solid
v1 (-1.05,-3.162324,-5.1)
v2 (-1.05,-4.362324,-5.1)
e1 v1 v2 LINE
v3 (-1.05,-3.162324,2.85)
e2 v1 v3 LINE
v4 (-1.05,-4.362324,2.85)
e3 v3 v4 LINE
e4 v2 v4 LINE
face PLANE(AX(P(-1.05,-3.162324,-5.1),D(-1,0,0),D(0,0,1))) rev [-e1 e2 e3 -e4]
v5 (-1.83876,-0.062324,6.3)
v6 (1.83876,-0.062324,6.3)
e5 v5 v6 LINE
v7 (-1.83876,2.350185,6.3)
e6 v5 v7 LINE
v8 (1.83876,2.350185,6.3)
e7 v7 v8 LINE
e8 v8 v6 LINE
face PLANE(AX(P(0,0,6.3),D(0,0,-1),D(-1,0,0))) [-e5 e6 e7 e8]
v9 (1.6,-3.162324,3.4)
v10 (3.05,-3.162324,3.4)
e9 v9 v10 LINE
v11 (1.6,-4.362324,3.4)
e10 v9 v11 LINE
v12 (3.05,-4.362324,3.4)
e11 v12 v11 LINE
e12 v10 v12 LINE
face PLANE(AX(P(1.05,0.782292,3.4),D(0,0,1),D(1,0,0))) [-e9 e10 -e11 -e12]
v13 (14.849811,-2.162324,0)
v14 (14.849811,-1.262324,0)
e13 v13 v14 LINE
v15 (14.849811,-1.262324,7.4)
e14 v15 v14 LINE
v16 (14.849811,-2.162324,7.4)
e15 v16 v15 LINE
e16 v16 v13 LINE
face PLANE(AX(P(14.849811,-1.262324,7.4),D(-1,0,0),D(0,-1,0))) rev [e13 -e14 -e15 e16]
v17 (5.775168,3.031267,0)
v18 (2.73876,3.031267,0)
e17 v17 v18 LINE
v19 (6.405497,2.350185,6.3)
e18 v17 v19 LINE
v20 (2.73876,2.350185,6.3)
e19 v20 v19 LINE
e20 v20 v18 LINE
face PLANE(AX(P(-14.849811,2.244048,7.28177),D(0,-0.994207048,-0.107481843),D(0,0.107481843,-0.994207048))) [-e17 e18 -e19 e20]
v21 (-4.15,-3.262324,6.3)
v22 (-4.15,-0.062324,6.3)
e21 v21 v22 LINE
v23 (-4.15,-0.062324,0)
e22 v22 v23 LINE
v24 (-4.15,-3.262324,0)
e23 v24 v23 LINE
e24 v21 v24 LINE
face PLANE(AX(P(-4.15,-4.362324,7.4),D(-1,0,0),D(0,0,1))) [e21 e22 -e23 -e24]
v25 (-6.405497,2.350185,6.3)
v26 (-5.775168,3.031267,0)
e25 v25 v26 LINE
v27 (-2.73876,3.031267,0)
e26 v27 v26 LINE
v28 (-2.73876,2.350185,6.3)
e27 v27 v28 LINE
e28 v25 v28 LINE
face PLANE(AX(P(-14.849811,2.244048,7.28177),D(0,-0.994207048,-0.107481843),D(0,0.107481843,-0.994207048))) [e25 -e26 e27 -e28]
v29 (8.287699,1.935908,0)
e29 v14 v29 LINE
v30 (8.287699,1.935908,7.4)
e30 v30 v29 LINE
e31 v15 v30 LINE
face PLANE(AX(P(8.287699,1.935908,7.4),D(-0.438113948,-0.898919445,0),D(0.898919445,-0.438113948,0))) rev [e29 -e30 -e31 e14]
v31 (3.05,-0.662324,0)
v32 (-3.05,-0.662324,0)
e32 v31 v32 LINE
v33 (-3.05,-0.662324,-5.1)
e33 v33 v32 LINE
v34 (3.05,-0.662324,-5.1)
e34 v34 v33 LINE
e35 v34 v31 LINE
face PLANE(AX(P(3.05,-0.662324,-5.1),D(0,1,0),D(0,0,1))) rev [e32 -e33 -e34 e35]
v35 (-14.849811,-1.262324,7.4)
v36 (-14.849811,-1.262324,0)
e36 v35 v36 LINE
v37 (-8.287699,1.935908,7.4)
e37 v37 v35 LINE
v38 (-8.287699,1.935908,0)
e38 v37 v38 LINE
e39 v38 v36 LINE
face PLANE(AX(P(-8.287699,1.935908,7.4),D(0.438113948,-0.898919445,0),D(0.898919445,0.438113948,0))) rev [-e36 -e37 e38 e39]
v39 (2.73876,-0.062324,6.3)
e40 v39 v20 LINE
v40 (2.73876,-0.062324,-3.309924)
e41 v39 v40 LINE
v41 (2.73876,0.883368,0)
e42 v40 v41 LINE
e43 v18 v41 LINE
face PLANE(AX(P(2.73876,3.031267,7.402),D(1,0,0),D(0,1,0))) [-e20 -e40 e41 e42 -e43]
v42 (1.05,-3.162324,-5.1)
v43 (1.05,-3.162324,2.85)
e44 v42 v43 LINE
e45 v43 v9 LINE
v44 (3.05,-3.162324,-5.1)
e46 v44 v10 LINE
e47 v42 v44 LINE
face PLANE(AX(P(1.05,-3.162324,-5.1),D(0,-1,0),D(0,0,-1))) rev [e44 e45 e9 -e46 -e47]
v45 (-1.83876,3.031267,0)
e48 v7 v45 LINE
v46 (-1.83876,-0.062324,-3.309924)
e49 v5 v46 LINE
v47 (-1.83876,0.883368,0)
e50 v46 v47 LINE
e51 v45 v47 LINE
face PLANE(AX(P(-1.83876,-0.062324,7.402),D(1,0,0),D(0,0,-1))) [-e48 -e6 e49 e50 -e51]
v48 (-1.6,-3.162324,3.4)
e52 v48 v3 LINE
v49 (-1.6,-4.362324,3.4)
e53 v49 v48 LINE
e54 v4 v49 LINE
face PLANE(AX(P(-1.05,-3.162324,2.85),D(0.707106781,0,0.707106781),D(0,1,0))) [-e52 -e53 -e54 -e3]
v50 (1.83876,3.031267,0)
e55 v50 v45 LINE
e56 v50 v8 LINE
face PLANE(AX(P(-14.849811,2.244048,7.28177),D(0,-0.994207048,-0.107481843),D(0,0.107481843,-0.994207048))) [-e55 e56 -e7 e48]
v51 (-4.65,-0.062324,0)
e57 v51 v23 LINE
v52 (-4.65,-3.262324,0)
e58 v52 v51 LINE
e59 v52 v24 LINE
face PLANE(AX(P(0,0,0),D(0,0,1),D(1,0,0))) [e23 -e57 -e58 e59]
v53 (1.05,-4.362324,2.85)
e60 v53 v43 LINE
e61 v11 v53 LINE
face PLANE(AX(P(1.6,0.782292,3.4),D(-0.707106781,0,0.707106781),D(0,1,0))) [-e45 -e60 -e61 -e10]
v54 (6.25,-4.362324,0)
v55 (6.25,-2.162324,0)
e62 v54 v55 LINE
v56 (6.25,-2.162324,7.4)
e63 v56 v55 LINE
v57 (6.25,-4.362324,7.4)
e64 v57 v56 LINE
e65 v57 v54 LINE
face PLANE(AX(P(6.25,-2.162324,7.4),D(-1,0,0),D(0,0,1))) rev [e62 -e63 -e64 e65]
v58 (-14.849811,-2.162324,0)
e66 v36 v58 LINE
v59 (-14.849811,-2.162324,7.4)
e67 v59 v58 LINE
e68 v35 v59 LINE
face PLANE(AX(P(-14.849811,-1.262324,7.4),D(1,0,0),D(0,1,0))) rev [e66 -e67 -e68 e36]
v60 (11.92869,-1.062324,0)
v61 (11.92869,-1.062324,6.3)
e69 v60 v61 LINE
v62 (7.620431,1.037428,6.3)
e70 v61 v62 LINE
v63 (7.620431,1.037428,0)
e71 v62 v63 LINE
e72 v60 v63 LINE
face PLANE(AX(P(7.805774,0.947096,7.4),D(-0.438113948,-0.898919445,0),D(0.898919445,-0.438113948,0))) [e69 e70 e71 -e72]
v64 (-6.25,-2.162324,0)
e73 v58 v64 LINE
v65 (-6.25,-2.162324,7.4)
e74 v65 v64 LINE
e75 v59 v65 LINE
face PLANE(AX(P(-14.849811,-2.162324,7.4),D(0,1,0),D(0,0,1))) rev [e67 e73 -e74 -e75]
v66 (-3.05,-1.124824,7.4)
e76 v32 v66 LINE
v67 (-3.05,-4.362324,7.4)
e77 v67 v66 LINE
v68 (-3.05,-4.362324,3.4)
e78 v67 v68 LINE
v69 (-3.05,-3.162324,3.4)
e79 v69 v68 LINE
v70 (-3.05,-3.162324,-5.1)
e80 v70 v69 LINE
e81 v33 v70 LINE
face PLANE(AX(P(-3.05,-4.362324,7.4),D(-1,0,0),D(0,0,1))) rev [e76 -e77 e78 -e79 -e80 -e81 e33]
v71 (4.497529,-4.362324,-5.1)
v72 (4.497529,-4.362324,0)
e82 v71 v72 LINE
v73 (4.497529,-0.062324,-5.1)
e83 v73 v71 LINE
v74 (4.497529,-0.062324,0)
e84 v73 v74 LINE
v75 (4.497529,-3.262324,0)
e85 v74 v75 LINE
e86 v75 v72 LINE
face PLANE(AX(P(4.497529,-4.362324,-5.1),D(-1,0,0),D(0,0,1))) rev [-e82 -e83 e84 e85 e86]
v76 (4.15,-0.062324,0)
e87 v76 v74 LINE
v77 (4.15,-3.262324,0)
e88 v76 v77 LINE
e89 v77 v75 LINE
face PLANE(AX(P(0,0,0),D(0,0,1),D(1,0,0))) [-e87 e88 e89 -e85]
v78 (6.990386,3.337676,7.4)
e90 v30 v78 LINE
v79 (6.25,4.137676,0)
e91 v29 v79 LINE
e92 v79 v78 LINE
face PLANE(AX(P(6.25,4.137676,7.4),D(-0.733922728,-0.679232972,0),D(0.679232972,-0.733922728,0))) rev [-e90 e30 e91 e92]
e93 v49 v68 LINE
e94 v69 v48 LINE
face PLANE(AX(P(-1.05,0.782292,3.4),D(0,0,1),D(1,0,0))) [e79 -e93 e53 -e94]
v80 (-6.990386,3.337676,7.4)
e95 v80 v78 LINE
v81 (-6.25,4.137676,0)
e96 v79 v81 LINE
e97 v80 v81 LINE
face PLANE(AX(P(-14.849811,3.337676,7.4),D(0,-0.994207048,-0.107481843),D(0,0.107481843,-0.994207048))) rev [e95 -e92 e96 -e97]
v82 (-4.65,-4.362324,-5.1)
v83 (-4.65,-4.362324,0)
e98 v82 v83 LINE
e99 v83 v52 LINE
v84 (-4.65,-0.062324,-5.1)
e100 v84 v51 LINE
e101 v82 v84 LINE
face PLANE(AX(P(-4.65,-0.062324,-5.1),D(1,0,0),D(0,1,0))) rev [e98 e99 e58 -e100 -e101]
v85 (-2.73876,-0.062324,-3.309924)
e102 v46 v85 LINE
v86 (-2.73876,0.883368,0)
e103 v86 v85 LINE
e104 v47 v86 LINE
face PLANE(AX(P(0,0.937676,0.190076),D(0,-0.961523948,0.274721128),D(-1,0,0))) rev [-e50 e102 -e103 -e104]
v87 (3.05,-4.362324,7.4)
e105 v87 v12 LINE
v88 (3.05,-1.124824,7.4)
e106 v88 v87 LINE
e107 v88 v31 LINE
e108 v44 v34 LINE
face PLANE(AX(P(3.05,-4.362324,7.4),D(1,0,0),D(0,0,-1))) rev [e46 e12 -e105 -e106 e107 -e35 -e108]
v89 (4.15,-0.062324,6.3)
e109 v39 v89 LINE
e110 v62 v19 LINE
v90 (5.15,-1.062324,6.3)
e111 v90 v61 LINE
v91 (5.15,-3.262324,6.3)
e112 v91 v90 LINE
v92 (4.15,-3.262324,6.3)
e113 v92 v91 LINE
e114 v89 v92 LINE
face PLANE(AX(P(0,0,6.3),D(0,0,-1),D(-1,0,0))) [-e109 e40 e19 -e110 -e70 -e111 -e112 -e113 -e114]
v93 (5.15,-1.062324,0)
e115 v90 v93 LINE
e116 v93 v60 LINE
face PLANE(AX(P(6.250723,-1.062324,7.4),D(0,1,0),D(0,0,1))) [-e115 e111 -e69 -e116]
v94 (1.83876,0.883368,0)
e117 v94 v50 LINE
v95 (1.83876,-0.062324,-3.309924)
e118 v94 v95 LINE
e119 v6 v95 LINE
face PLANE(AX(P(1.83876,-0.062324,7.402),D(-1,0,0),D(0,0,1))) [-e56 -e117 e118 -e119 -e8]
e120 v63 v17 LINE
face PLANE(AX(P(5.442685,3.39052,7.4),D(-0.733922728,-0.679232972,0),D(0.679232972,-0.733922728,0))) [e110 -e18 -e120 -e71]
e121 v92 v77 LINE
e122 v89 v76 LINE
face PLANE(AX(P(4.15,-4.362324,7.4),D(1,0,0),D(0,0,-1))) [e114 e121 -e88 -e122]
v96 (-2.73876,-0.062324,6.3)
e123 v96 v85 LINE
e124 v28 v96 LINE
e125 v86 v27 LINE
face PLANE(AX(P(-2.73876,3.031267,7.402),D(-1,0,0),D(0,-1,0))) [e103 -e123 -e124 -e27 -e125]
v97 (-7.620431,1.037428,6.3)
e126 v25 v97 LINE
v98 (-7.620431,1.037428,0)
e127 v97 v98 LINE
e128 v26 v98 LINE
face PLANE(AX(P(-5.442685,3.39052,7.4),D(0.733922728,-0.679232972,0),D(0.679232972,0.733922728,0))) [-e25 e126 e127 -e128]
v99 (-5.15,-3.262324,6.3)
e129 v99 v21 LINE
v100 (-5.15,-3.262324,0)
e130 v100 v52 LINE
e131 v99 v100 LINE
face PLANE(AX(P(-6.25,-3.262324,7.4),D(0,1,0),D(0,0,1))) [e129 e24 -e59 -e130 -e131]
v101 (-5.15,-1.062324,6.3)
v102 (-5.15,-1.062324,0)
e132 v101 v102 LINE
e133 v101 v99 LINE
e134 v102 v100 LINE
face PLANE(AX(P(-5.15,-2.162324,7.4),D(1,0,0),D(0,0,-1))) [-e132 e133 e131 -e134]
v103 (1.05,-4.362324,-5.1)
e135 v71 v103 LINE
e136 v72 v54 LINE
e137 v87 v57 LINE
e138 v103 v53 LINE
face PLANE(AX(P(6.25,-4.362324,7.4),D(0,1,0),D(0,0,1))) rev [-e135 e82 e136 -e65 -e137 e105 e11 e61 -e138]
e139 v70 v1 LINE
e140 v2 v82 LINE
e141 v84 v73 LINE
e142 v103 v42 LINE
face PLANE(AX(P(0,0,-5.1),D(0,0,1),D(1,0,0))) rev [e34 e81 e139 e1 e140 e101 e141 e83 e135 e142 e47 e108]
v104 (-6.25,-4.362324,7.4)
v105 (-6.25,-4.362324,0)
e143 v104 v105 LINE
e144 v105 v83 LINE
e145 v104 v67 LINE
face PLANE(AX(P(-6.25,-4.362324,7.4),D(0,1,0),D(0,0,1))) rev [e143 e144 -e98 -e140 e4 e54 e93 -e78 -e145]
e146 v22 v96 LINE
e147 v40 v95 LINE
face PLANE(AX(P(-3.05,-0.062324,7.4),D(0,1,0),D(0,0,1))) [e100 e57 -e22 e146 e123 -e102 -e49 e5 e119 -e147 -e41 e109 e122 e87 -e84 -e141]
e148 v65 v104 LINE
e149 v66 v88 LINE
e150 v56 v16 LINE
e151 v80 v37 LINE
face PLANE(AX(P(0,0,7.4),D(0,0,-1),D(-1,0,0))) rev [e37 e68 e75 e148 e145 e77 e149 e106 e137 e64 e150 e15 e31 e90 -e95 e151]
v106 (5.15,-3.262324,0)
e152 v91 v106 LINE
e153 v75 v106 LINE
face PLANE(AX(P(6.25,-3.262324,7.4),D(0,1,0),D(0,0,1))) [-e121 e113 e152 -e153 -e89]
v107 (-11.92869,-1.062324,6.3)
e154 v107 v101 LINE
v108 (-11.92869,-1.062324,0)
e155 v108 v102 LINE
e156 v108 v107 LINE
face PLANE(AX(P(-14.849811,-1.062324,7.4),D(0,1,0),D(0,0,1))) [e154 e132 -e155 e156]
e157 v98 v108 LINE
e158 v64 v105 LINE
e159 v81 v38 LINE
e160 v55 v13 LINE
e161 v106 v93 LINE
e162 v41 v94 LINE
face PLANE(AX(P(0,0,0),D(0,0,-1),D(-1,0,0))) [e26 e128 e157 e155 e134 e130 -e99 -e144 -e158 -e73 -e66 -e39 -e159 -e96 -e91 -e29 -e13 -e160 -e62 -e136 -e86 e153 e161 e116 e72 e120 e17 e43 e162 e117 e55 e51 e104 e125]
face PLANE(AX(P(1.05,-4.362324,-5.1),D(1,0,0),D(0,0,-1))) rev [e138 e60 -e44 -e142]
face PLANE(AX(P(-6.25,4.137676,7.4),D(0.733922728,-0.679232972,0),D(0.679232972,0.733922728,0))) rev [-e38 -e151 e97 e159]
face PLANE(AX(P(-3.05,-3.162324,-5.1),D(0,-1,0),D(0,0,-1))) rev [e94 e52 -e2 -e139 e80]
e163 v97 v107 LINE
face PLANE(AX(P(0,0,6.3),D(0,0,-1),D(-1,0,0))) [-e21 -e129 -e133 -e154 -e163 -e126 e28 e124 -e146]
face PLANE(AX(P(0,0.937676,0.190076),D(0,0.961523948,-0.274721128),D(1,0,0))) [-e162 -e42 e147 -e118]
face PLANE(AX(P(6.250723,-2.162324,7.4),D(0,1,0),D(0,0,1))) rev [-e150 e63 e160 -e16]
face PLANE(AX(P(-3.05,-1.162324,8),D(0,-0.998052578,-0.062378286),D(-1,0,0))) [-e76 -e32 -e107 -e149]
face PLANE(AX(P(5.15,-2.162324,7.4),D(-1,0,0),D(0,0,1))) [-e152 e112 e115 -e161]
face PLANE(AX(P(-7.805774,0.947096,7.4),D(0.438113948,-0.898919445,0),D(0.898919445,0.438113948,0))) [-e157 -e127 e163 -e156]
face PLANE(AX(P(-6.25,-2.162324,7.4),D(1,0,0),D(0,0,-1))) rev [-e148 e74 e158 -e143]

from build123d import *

# Parameters (mm, degrees)
BOSS_EXTRUDE1_DEPTH = 7.4
CUT_EXTRUDE1_DEPTH  = 31.916943618
CHAMFER1_SIZE       = 0.5
CHAMFER1_SIZE_2     = 8
BOSS_EXTRUDE2_DEPTH = 5.1
SKETCH8_W           = 2
SKETCH8_H           = 3.4
BOSS_EXTRUDE5_DEPTH = 1.2
CHAMFER2_SIZE       = 0.55
BOSS_EXTRUDE6_REACH = 19.155
SKETCH9_W           = 0.9
SKETCH9_H           = 3.093590623
SKETCH10_W          = 0.9
SKETCH10_H          = 3.309924143
BOSS_EXTRUDE7_DEPTH = 1
CHAMFER3_SIZE       = 3.5
CHAMFER3_SIZE_2     = 1


with BuildPart() as part:
    # Sketch1 → Boss-Extrude1 (new body)
    with BuildSketch(Plane.XY):
        Polygon((-6.25, 4.137675877), (6.25, 4.137675877), (8.287698915, 1.935907694), (14.849810865, -1.262324123), (14.849810865, -2.162324123), (6.250723489, -2.162324123), (6.25, -4.362324123), (3.05, -4.362324123), (3.05, -1.162324123), (-3.05, -1.162324123), (-3.05, -4.362324123), (-6.25, -4.362324123), (-6.25, -2.162324123), (-14.849810865, -2.162324123), (-14.849810865, -1.262324123), (-8.287698915, 1.935907694), align=None)
    extrude(amount=BOSS_EXTRUDE1_DEPTH)

    # Sketch3 → Cut-Extrude1 (cut, through all)
    with BuildSketch(Plane(origin=(14.849810865, 0, 0), x_dir=(0, 0, -1), z_dir=(1, 0, 0))):
        Polygon((-7.4, 3.337675877), (0, 4.137675877), (-7.4, 4.137675877), align=None)
    extrude(amount=-CUT_EXTRUDE1_DEPTH, mode=Mode.SUBTRACT)

    # Shell1: read off the stored shape, not the designer's step
    # Shell1: loft between two sections, ruled curve by curve
    shell1_from = [
        Edge.make_line((5.15, -1.062324123, 6.3), (11.928689782, -1.062324123, 6.3)),
        Edge.make_line((-11.928689782, -1.062324123, 6.3), (-5.15, -1.062324123, 6.3)),
        Edge.make_line((11.928689782, -1.062324123, 6.3), (7.620430834, 1.037428357, 6.3)),
        Edge.make_line((7.620430834, 1.037428357, 6.3), (6.405496555, 2.350185419, 6.3)),
        Edge.make_line((-6.405496555, 2.350185419, 6.3), (-7.620430834, 1.037428357, 6.3)),
        Edge.make_line((-7.620430834, 1.037428357, 6.3), (-11.928689782, -1.062324123, 6.3)),
        Edge.make_line((-5.15, -1.062324123, 6.3), (-5.15, -3.262324123, 6.3)),
        Edge.make_line((-5.15, -3.262324123, 6.3), (-4.15, -3.262324123, 6.3)),
        Edge.make_line((4.15, -3.262324123, 6.3), (5.15, -3.262324123, 6.3)),
        Edge.make_line((-4.15, -3.262324123, 6.3), (-4.15, -0.062324123, 6.3)),
        Edge.make_line((-4.15, -0.062324123, 6.3), (4.15, -0.062324123, 6.3)),
        Edge.make_line((4.15, -0.062324123, 6.3), (4.15, -3.262324123, 6.3)),
        Edge.make_line((5.15, -3.262324123, 6.3), (5.15, -1.062324123, 6.3)),
        Edge.make_line((6.405496555, 2.350185419, 6.3), (-6.405496555, 2.350185419, 6.3)),
    ]
    shell1_to = [
        Edge.make_line((5.15, -1.062324123, 0), (11.928689782, -1.062324123, 0)),
        Edge.make_line((-11.928689782, -1.062324123, 0), (-5.15, -1.062324123, 0)),
        Edge.make_line((11.928689782, -1.062324123, 0), (7.620430834, 1.037428357, 0)),
        Edge.make_line((7.620430834, 1.037428357, 0), (5.775167626, 3.0312665, 0)),
        Edge.make_line((-5.775167626, 3.0312665, 0), (-7.620430834, 1.037428357, 0)),
        Edge.make_line((-7.620430834, 1.037428357, 0), (-11.928689782, -1.062324123, 0)),
        Edge.make_line((-5.15, -1.062324123, 0), (-5.15, -3.262324123, 0)),
        Edge.make_line((-5.15, -3.262324123, 0), (-4.15, -3.262324123, 0)),
        Edge.make_line((4.15, -3.262324123, 0), (5.15, -3.262324123, 0)),
        Edge.make_line((-4.15, -3.262324123, 0), (-4.15, -0.062324123, 0)),
        Edge.make_line((-4.15, -0.062324123, 0), (4.15, -0.062324123, 0)),
        Edge.make_line((4.15, -0.062324123, 0), (4.15, -3.262324123, 0)),
        Edge.make_line((5.15, -3.262324123, 0), (5.15, -1.062324123, 0)),
        Edge.make_line((5.775167626, 3.0312665, 0), (-5.775167626, 3.0312665, 0)),
    ]
    shell1 = Solid(Shell([*[Face.make_surface_from_curves(shell1_from[k], shell1_to[k]) for k in range(14)], Face(Wire(shell1_from)), Face(Wire(shell1_to))]))
    add(shell1, mode=Mode.SUBTRACT)

    # Chamfer1
    # the kernel refuses this chamfer: 8, 0.5 mm, written as the material it takes off along each edge
    with BuildSketch(Plane(origin=(3.05, -1.162324123, 0), x_dir=(0, 1, 0), z_dir=(-1, 0, 0))) as chamfer1_piece_1:
        Polygon((CHAMFER1_SIZE, 0), (0, -CHAMFER1_SIZE_2), (0, 0), align=None)
    extrude(amount=6.1, mode=Mode.SUBTRACT)

    # Sketch7 → Boss-Extrude2 (add)
    with BuildSketch(Plane(origin=(0, 0, 0), x_dir=(-1, 0, 0), z_dir=(0, 0, -1))):
        Polygon((-3.05, -4.362324123), (-1.05, -4.362324123), (-1.05, -3.162324123), (-3.05, -3.162324123), (-3.05, -0.662324123), (3.05, -0.662324123), (3.05, -3.162324123), (1.05, -3.162324123), (1.05, -4.362324123), (3.05, -4.362324123), (4.65, -4.362324123), (4.65, -0.062324123), (-4.497528609, -0.062324123), (-4.497528609, -4.362324123), align=None)
    extrude(amount=BOSS_EXTRUDE2_DEPTH)

    # Sketch8 → Boss-Extrude5 (add)
    with BuildSketch(Plane(origin=(0, -4.362324123, 0), x_dir=(-1, 0, 0), z_dir=(0, -1, 0))):
        with Locations((-2.05, -1.7)):
            Rectangle(SKETCH8_W, SKETCH8_H)
        with Locations((2.05, -1.7)):
            Rectangle(SKETCH8_W, SKETCH8_H)
    extrude(amount=-BOSS_EXTRUDE5_DEPTH)

    # Chamfer2
    chamfer2_edges = [part.edges().sort_by_distance(p)[0] for p in [
        (1.05, -3.762324123, 3.4),
        (-1.05, -3.762324123, 3.4),
    ]]
    chamfer(chamfer2_edges, length=CHAMFER2_SIZE)

    # Sketch9 → Boss-Extrude6 (add, up to next)
    with BuildSketch(Plane(origin=(0, 0, 0), x_dir=(-1, 0, 0), z_dir=(0, 0, -1)), mode=Mode.PRIVATE) as boss_extrude6_sk1:
        with Locations((-2.288760134, 1.484471189)):
            Rectangle(SKETCH9_W, SKETCH9_H)
    boss_extrude6_tool1 = extrude(boss_extrude6_sk1.sketch, amount=-BOSS_EXTRUDE6_REACH, mode=Mode.PRIVATE) - part.part
    # Sketch9 → Boss-Extrude6 (add, up to next)
    with BuildSketch(Plane(origin=(0, 0, 0), x_dir=(-1, 0, 0), z_dir=(0, 0, -1)), mode=Mode.PRIVATE) as boss_extrude6_sk2:
        with Locations((2.288760134, 1.484471189)):
            Rectangle(SKETCH9_W, SKETCH9_H)
    boss_extrude6_tool2 = extrude(boss_extrude6_sk2.sketch, amount=-BOSS_EXTRUDE6_REACH, mode=Mode.PRIVATE) - part.part
    add(boss_extrude6_tool1.solids().sort_by_distance((2.28876, 1.484471, 0))[0])
    add(boss_extrude6_tool2.solids().sort_by_distance((-2.28876, 1.484471, 0))[0])

    # Sketch10 → Boss-Extrude7 (add)
    with BuildSketch(Plane(origin=(0, -0.062324123, 0), x_dir=(1, 0, 0), z_dir=(0, 1, 0))):
        with Locations((2.288760134, 1.654962072)):
            Rectangle(SKETCH10_W, SKETCH10_H)
        with Locations((-2.288760134, 1.654962072)):
            Rectangle(SKETCH10_W, SKETCH10_H)
    extrude(amount=BOSS_EXTRUDE7_DEPTH)

    # Chamfer3
    # the kernel refuses this chamfer: 3.5, 1 mm, written as the material it takes off along each edge
    with BuildSketch(Plane(origin=(-11.825802237, 0.937675877, -3.309924143), x_dir=(0, 0, 1), z_dir=(1, 0, 0))) as chamfer3_piece_1_section:
        Polygon((CHAMFER3_SIZE, 0), (0, CHAMFER3_SIZE_2), (0, 0), align=None)
    chamfer3_piece_1 = extrude(amount=19.074084206, mode=Mode.PRIVATE)
    chamfer3_piece_1 = split(chamfer3_piece_1, bisect_by=Plane(origin=(-11.825802237, 0.937675877, 0), z_dir=(0, 0, -1)), keep=Keep.TOP, mode=Mode.PRIVATE)
    chamfer3_piece_1 = split(chamfer3_piece_1, bisect_by=Plane(origin=(-11.825802237, -0.062324123, -3.309924143), z_dir=(0, 1, 0)), keep=Keep.TOP, mode=Mode.PRIVATE)
    add(chamfer3_piece_1, mode=Mode.SUBTRACT)
    with BuildSketch(Plane(origin=(-7.248281969, 0.937675877, -3.309924143), x_dir=(0, 0, 1), z_dir=(1, 0, 0))) as chamfer3_piece_2_section:
        Polygon((CHAMFER3_SIZE, 0), (0, CHAMFER3_SIZE_2), (0, 0), align=None)
    chamfer3_piece_2 = extrude(amount=19.074084206, mode=Mode.PRIVATE)
    chamfer3_piece_2 = split(chamfer3_piece_2, bisect_by=Plane(origin=(-7.248281969, 0.937675877, 0), z_dir=(0, 0, -1)), keep=Keep.TOP, mode=Mode.PRIVATE)
    chamfer3_piece_2 = split(chamfer3_piece_2, bisect_by=Plane(origin=(-7.248281969, -0.062324123, -3.309924143), z_dir=(0, 1, 0)), keep=Keep.TOP, mode=Mode.PRIVATE)
    add(chamfer3_piece_2, mode=Mode.SUBTRACT)


solid = part.part
